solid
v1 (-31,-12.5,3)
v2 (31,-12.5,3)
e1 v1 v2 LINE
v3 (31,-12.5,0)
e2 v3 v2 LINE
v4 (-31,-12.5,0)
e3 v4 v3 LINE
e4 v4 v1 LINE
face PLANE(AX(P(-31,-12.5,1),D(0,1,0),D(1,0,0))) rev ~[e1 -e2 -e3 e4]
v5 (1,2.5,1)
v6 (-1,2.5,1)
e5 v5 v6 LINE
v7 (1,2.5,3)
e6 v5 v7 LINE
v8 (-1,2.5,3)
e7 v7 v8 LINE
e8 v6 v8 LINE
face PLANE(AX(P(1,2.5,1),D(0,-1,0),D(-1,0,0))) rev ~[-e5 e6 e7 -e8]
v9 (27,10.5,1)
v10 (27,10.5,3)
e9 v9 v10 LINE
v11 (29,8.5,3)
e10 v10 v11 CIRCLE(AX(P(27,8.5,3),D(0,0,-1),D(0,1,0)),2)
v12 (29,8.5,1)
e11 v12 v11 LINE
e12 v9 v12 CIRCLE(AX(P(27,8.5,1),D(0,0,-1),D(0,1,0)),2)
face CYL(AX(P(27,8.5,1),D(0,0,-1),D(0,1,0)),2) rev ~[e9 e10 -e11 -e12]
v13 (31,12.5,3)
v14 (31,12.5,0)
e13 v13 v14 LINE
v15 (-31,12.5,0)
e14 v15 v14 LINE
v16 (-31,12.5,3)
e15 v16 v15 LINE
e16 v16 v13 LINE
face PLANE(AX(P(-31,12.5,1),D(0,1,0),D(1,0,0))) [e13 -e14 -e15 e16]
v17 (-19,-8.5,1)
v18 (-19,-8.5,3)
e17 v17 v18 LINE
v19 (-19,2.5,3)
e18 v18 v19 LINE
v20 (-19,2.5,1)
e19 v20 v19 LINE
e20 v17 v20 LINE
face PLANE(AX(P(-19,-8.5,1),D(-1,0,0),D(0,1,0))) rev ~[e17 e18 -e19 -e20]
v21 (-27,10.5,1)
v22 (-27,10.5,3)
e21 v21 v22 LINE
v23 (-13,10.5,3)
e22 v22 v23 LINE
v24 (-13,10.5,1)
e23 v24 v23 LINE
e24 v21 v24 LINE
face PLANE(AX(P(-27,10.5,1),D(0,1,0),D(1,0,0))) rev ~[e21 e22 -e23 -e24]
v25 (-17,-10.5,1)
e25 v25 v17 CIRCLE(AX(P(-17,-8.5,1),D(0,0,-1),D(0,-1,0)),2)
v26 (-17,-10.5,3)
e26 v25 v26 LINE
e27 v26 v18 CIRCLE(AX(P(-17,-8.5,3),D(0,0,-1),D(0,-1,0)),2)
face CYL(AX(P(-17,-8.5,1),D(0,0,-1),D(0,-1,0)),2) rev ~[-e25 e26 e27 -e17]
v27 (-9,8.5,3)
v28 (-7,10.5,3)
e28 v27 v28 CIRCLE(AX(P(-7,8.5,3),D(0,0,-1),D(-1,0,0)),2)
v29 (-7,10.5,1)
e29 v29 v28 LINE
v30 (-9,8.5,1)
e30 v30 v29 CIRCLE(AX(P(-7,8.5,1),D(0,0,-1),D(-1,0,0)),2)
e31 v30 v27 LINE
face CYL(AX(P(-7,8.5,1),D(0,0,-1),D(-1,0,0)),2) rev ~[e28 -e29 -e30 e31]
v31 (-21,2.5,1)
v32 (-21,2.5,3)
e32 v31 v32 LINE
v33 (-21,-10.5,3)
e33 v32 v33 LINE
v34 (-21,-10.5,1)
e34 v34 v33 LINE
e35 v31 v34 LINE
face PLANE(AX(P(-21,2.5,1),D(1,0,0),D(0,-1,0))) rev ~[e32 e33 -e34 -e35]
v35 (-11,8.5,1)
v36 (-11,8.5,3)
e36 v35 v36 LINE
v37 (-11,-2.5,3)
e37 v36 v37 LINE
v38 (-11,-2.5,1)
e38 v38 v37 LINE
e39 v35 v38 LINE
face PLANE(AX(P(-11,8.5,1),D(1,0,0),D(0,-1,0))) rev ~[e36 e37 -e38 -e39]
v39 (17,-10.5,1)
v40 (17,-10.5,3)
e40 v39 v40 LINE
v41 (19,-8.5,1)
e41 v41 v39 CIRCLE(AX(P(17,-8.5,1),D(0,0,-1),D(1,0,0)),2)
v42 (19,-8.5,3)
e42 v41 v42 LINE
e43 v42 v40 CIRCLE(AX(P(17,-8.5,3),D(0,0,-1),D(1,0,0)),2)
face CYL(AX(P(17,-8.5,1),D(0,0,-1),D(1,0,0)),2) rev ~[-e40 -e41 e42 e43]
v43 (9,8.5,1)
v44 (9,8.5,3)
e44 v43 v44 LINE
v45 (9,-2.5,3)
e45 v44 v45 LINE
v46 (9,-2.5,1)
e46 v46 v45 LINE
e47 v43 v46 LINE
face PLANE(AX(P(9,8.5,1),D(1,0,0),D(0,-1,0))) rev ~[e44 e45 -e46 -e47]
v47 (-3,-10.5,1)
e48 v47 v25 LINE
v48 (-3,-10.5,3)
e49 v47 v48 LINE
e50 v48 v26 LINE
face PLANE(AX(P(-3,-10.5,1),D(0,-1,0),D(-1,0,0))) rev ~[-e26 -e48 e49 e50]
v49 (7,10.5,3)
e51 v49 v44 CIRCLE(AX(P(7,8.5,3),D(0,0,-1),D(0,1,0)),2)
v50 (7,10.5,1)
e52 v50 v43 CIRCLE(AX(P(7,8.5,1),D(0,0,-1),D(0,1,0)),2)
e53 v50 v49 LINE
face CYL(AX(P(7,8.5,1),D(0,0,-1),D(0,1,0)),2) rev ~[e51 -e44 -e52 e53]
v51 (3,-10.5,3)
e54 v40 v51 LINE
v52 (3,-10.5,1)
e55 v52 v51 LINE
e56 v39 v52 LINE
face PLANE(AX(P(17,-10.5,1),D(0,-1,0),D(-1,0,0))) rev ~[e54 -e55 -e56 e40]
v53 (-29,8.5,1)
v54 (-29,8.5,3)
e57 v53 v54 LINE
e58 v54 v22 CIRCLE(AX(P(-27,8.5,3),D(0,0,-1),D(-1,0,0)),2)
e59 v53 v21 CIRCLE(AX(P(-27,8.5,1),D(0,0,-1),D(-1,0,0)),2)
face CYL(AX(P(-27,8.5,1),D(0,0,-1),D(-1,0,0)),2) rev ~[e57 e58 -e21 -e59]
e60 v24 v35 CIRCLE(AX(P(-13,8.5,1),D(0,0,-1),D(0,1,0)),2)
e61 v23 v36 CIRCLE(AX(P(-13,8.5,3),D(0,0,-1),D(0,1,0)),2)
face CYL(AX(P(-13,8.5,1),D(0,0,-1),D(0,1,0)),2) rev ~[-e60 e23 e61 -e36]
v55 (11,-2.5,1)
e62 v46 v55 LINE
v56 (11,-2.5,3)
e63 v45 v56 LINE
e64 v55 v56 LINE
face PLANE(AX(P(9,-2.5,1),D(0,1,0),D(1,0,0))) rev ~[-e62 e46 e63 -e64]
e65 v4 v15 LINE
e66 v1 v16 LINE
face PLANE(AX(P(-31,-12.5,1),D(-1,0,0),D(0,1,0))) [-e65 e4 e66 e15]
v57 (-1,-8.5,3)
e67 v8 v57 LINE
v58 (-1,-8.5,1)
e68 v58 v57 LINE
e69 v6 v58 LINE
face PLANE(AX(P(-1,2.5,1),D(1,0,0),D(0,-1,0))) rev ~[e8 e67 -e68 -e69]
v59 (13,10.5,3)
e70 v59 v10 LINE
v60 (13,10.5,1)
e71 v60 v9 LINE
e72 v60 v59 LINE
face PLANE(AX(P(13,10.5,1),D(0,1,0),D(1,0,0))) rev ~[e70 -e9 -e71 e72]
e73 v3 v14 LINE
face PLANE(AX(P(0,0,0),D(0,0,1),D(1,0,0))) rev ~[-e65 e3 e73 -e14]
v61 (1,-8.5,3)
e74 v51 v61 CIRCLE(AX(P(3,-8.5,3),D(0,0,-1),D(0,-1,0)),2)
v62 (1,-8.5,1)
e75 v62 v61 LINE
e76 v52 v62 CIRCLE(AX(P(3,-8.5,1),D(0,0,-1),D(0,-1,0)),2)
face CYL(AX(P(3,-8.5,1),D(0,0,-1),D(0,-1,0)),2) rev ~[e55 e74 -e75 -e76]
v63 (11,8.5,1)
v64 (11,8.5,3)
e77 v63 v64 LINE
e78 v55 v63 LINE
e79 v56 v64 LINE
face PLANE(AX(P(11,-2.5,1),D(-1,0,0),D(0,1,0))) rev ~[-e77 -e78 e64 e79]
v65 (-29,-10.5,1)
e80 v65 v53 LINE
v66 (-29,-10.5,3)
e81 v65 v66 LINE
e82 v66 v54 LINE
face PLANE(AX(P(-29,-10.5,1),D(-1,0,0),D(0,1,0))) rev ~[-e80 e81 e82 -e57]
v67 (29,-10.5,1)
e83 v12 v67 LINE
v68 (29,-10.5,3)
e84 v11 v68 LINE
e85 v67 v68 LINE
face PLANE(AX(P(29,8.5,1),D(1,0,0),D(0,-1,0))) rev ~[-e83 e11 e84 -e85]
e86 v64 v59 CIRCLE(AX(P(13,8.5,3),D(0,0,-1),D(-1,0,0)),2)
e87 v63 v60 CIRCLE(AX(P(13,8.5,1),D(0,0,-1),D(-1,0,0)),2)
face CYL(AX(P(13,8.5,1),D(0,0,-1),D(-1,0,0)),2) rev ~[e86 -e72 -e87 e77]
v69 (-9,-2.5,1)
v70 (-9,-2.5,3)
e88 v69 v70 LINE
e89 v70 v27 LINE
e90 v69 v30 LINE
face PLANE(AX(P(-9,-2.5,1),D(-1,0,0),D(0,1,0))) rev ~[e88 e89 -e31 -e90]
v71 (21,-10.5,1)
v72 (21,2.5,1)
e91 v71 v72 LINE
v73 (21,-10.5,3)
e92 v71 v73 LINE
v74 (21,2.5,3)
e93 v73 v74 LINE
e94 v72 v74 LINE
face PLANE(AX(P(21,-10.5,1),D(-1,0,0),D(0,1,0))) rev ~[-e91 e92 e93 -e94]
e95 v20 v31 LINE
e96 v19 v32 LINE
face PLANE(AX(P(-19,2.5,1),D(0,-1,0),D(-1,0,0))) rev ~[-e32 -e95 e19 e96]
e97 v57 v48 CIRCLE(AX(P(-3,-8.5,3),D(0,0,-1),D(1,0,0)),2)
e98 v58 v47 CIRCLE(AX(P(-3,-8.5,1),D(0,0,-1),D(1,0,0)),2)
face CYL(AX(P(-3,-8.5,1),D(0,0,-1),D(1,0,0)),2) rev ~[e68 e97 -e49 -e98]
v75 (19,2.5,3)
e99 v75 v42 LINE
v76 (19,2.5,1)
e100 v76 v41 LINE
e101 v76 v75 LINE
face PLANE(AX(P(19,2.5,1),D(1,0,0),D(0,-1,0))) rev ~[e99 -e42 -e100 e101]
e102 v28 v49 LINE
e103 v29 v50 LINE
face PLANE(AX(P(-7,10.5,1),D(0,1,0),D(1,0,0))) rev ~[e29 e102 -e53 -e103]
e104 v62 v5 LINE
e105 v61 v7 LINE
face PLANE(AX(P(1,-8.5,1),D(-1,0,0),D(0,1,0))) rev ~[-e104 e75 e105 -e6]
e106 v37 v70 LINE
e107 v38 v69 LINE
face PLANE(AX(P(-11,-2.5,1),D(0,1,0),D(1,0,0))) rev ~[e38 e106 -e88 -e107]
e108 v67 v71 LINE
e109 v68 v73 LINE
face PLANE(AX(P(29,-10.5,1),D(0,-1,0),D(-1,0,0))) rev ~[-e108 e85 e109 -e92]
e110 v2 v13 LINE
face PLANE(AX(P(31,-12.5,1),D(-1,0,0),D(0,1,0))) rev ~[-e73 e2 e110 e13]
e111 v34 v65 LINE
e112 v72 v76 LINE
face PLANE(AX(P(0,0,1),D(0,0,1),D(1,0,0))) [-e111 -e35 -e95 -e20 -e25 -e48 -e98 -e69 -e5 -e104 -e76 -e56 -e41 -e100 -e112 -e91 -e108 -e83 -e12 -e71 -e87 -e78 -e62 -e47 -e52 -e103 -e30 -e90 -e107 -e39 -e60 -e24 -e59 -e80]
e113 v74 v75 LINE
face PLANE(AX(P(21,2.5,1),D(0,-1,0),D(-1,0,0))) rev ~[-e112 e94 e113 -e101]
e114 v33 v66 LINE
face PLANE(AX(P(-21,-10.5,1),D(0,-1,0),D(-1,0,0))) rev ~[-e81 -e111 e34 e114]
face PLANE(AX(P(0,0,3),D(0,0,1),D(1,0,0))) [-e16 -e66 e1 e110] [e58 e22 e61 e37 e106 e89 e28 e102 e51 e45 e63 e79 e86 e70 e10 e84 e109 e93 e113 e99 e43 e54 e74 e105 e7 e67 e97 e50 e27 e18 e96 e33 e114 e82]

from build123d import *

# Parameters (mm, degrees)
F0_W     = 62
F0_H     = 25
F1_DEPTH = 1
F2_W     = 62
F2_H     = 25
F3_DEPTH = 2


# Not quite as in the source:
# - a feature names something its author has since deleted; it is built from what else it names


with BuildPart() as f1:
    # F0 (on Top) → F1 (new body)
    with BuildSketch(Plane.XY):
        Rectangle(F0_W, F0_H)
    extrude(amount=F1_DEPTH)

    # F2 (on face) → F3 (join)
    with BuildSketch(Plane.XY.offset(1)):
        Rectangle(F2_W, F2_H)
        with BuildLine():
            ThreePointArc((-29, 8.5), (-28.4142135624, 9.9142135624), (-27, 10.5))
            Line((-27, 10.5), (-13, 10.5))
            ThreePointArc((-13, 10.5), (-11.5857864376, 9.9142135624), (-11, 8.5))
            Line((-11, 8.5), (-11, -2.5))
            Line((-11, -2.5), (-9, -2.5))
            Line((-9, -2.5), (-9, 8.5))
            ThreePointArc((-9, 8.5), (-8.4142135624, 9.9142135624), (-7, 10.5))
            Line((-7, 10.5), (7, 10.5))
            ThreePointArc((7, 10.5), (8.4142135624, 9.9142135624), (9, 8.5))
            Line((9, 8.5), (9, -2.5))
            Line((9, -2.5), (11, -2.5))
            Line((11, -2.5), (11, 8.5))
            ThreePointArc((11, 8.5), (11.5857864376, 9.9142135624), (13, 10.5))
            Line((13, 10.5), (27, 10.5))
            ThreePointArc((27, 10.5), (28.4142135624, 9.9142135624), (29, 8.5))
            Line((29, 8.5), (29, -10.5))
            Line((29, -10.5), (21, -10.5))
            Line((21, -10.5), (21, 2.5))
            Line((21, 2.5), (19, 2.5))
            Line((19, 2.5), (19, -8.5))
            ThreePointArc((19, -8.5), (18.4142135624, -9.9142135624), (17, -10.5))
            Line((17, -10.5), (3, -10.5))
            ThreePointArc((3, -10.5), (1.5857864376, -9.9142135624), (1, -8.5))
            Line((1, -8.5), (1, 2.5))
            Line((1, 2.5), (-1, 2.5))
            Line((-1, 2.5), (-1, -8.5))
            ThreePointArc((-1, -8.5), (-1.5857864376, -9.9142135624), (-3, -10.5))
            Line((-3, -10.5), (-17, -10.5))
            ThreePointArc((-17, -10.5), (-18.4142135624, -9.9142135624), (-19, -8.5))
            Line((-19, -8.5), (-19, 2.5))
            Line((-19, 2.5), (-21, 2.5))
            Line((-21, 2.5), (-21, -10.5))
            Line((-21, -10.5), (-29, -10.5))
            Line((-29, -10.5), (-29, 8.5))
        make_face(mode=Mode.SUBTRACT)
    extrude(amount=F3_DEPTH)


solid = f1.part
